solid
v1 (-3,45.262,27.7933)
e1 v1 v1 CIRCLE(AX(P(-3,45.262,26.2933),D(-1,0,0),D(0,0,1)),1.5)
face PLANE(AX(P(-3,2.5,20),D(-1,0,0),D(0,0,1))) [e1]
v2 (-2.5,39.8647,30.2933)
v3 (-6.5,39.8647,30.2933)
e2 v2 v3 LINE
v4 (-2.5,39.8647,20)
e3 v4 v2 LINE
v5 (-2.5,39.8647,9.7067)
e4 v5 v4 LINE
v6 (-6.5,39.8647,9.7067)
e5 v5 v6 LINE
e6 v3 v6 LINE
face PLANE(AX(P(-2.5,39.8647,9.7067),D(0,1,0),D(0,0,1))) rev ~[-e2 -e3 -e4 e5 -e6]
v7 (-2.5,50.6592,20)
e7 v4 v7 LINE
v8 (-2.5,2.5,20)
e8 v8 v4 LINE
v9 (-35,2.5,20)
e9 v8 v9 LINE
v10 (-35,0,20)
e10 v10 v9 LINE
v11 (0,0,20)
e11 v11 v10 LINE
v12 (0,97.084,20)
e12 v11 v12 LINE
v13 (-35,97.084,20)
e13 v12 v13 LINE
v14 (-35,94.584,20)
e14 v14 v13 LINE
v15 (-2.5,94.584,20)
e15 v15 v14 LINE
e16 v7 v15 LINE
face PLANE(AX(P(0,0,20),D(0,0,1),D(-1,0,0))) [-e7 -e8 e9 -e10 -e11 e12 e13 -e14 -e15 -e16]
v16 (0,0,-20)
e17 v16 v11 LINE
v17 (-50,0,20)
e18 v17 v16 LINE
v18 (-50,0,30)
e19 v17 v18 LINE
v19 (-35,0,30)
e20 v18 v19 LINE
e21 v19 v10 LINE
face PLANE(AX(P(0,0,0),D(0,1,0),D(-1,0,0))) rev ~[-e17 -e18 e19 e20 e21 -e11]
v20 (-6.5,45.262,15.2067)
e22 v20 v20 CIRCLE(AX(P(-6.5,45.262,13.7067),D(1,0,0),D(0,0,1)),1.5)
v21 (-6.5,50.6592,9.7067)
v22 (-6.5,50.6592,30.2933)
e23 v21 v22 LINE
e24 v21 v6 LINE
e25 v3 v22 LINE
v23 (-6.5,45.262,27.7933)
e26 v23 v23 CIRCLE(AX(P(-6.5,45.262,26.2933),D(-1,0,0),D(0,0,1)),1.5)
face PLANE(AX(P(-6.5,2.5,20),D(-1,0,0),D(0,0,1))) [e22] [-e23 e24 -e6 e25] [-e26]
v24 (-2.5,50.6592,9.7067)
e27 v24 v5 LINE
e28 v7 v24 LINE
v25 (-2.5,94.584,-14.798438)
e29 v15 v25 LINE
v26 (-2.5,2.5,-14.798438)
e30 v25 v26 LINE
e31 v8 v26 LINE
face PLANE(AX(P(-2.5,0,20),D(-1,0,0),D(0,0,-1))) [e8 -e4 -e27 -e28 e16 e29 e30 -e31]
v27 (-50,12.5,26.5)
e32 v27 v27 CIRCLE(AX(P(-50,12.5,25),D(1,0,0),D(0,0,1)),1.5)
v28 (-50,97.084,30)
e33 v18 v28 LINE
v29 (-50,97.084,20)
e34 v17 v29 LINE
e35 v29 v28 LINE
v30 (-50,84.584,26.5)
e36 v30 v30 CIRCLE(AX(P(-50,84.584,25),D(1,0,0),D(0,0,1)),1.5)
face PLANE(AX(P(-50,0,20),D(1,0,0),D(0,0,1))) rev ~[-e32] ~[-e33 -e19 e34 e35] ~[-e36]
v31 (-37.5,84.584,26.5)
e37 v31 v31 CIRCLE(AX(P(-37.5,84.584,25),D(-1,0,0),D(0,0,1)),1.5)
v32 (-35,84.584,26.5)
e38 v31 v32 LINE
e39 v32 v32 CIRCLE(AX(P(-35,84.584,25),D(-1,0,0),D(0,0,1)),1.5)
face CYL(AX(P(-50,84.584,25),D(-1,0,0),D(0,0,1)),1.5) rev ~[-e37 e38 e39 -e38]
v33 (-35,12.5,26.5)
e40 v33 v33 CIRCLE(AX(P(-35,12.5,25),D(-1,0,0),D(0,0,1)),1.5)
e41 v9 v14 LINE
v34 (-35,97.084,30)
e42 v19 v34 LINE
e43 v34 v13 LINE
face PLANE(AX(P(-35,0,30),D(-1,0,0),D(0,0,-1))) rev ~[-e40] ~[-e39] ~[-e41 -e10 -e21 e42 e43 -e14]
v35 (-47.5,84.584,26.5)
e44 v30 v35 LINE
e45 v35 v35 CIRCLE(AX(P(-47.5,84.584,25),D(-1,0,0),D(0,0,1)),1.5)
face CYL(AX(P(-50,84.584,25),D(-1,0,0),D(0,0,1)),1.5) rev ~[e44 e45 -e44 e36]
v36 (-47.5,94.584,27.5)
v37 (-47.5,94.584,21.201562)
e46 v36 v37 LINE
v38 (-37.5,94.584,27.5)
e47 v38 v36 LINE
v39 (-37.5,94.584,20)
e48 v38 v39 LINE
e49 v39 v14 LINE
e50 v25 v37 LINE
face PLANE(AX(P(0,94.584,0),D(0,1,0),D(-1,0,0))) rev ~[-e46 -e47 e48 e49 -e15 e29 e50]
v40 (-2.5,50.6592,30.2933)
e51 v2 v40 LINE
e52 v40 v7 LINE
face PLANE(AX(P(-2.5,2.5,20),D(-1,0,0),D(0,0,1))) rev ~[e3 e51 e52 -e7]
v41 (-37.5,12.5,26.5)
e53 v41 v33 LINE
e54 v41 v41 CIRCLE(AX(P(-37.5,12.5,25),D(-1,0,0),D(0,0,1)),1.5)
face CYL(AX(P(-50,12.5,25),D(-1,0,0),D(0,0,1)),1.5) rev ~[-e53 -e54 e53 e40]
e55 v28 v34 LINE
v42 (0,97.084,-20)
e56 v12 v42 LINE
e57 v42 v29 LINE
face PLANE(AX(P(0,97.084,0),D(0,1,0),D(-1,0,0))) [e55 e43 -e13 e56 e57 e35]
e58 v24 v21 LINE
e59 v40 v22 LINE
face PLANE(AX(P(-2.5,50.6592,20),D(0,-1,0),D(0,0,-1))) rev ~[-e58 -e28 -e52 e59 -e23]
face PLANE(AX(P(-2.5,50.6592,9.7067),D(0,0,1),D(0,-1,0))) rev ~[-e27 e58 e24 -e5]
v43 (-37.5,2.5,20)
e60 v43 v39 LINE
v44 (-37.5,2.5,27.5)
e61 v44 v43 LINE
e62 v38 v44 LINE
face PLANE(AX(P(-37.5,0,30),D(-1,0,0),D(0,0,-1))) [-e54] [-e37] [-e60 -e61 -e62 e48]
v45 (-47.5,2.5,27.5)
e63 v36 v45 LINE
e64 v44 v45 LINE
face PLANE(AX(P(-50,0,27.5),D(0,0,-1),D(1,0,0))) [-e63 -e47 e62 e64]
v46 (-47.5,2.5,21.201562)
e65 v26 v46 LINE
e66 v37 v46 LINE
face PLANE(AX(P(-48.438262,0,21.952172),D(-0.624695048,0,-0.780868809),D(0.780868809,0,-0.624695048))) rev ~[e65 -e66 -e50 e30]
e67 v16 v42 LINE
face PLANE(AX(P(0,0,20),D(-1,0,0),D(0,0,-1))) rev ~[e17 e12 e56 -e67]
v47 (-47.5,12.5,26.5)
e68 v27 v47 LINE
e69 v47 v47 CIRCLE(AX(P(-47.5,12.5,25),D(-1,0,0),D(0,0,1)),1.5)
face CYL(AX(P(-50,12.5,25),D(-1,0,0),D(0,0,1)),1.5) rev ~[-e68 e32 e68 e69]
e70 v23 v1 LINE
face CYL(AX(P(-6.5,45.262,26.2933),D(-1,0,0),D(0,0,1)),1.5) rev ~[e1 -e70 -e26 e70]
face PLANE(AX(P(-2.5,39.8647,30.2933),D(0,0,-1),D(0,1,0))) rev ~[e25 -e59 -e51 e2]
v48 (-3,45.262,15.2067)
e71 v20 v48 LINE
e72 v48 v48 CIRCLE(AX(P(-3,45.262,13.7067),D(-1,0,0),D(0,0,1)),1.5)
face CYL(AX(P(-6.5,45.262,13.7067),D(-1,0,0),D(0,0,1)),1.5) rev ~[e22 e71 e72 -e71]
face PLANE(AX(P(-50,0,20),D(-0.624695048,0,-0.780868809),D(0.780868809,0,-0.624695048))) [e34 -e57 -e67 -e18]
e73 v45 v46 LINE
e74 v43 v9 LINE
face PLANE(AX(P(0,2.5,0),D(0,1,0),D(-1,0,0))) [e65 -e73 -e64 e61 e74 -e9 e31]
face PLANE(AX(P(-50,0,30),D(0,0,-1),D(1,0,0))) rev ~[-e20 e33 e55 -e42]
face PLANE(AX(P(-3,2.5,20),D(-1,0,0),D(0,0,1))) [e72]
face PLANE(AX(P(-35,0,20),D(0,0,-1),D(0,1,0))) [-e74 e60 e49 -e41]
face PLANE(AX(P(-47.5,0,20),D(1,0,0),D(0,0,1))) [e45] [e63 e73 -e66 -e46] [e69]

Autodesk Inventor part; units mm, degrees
ref_plane "YZ Plane" through (0, 0, 0) normal (1, 0, 0) x (0, 1, 0)
ref_plane "XZ Plane" through (0, 0, 0) normal (0, 1, 0) x (-1, 0, 0)
ref_plane "XY Plane" through (0, 0, 0) normal (0, 0, 1) x (1, 0, 0)
sketch "Esboço1" plane through (0, 0, 0) normal (0, 1, 0) x (-1, 0, 0)
  line L0 (0, 20) -> (0, -20)
  line L1 (0, 20) -> (50, 20)
  line L2 (50, 20) -> (0, -20)
  line L3 (50, 20) -> (50, 30)
  line L4 (50, 30) -> (35, 30)
  line L5 (35, 30) -> (35, 20)
  point P0 (0, 0)
  dimension "d0" = 40
  dimension "d1" = 50
  dimension "d2" = 10
  dimension "d3" = 15
extrude "Extrusão1" add sketch "Esboço1" along normal blind 97.084
shell "Casca1" thickness 2.5 removed faces 1 at (-23.3333, 32.3613, 20)
sketch "Esboço2" plane through (-50, 0, 20) normal (-1, 0, 0) x (0, 0, 1)
  line L0 (10, 97.084) -> (0, 97.084) projected
  line L1 (0, 97.084) -> (5, 97.084)
  line L2 (5, 97.084) -> (5, 84.584)
  circle A0 centre (5, 84.584) radius 1.5
  line L3 (10, 0) -> (0, 0) projected
  line L4 (0, 0) -> (5, 0)
  line L5 (5, 0) -> (5, 12.5)
  circle A1 centre (5, 12.5) radius 1.5
  point P0 (-20, 0)
  dimension "d7" = 5
  dimension "d8" = 12.5
  dimension "d9" = 3
  dimension "d10" = 5
  dimension "d11" = 12.5
  dimension "d12" = 3
extrude "Extrusão2" cut sketch "Esboço2" against normal blind 102.84
thread "Rosca1" size "M3x0.5" class "6H" standard "ANSI Metric M Profile" length 20
thread "Rosca2" size "M3x0.5" class "6H" standard "ANSI Metric M Profile" length 20
thread "Rosca3" size "M3x0.5" class "6H" standard "ANSI Metric M Profile" length 20
thread "Rosca4" size "M3x0.5" class "6H" standard "ANSI Metric M Profile" length 20
sketch "Esboço3" plane through (0, 97.084, 0) normal (0, 1, 0) x (1, 0, 0)
  line L0 (-50, -30) -> (-35, -30) projected
  point P0 (0, 0)
  point P1 (-35, -20)
  dimension "d23" = 10
sketch "Esboço4" plane through (-50, 0, 20) normal (-1, 0, 0) x (0, 0, 1)
  line L0 (0, 97.084) -> (10, 97.084) projected
  line L1 (0, 0) -> (10, 0) projected
  point P0 (-20, 0)
  dimension "d24" = 97.084
sketch "Esboço5" plane through (0, 97.084, 0) normal (0, 1, 0) x (1, 0, 0)
  point P0 (0, 0)
sketch "Esboço6" plane through (-2.5, 2.5, 20) normal (-1, 0, 0) x (0, 0, 1)
  line L0 (-10.2933, 37.3647) -> (10.2933, 37.3647)
  line L1 (10.2933, 37.3647) -> (10.2933, 48.1592)
  line L2 (10.2933, 48.1592) -> (-10.2933, 48.1592)
  line L3 (-10.2933, 48.1592) -> (-10.2933, 37.3647)
  line L4 (0, 92.084) -> (0, 0) projected
  line L5 (-10.2933, 37.3647) -> (10.2933, 48.1592) construction
  line L6 (10.2933, 37.3647) -> (-10.2933, 48.1592) construction
  point P0 (-20, -2.5)
  point P1 (0, 42.762)
extrude "Extrusão3" add sketch "Esboço6" along normal blind 4
sketch "Esboço7" plane through (-6.5, 2.5, 20) normal (-1, 0, 0) x (0, 0, 1)
  line L0 (-10.2933, 48.1592) -> (-10.2933, 37.3647) projected
  line L1 (-10.2933, 42.762) -> (-6.2933, 42.762)
  line L2 (10.2933, 37.3647) -> (10.2933, 48.1592) projected
  line L3 (10.2933, 42.762) -> (6.2933, 42.762)
  circle A0 centre (-6.2933, 42.762) radius 1.5
  circle A1 centre (6.2933, 42.762) radius 1.5
  point P0 (-20, -2.5)
  dimension "d27" = 4
  dimension "d28" = 4
  dimension "d29" = 3
  dimension "d30" = 3
extrude "Extrusão4" cut sketch "Esboço7" against normal blind 3.5
thread "Rosca5" size "M3x0.5" class "6H" standard "ANSI Metric M Profile" length 20
thread "Rosca6" size "M3x0.5" class "6H" standard "ANSI Metric M Profile" length 20
properties part number "Rampa 1"
